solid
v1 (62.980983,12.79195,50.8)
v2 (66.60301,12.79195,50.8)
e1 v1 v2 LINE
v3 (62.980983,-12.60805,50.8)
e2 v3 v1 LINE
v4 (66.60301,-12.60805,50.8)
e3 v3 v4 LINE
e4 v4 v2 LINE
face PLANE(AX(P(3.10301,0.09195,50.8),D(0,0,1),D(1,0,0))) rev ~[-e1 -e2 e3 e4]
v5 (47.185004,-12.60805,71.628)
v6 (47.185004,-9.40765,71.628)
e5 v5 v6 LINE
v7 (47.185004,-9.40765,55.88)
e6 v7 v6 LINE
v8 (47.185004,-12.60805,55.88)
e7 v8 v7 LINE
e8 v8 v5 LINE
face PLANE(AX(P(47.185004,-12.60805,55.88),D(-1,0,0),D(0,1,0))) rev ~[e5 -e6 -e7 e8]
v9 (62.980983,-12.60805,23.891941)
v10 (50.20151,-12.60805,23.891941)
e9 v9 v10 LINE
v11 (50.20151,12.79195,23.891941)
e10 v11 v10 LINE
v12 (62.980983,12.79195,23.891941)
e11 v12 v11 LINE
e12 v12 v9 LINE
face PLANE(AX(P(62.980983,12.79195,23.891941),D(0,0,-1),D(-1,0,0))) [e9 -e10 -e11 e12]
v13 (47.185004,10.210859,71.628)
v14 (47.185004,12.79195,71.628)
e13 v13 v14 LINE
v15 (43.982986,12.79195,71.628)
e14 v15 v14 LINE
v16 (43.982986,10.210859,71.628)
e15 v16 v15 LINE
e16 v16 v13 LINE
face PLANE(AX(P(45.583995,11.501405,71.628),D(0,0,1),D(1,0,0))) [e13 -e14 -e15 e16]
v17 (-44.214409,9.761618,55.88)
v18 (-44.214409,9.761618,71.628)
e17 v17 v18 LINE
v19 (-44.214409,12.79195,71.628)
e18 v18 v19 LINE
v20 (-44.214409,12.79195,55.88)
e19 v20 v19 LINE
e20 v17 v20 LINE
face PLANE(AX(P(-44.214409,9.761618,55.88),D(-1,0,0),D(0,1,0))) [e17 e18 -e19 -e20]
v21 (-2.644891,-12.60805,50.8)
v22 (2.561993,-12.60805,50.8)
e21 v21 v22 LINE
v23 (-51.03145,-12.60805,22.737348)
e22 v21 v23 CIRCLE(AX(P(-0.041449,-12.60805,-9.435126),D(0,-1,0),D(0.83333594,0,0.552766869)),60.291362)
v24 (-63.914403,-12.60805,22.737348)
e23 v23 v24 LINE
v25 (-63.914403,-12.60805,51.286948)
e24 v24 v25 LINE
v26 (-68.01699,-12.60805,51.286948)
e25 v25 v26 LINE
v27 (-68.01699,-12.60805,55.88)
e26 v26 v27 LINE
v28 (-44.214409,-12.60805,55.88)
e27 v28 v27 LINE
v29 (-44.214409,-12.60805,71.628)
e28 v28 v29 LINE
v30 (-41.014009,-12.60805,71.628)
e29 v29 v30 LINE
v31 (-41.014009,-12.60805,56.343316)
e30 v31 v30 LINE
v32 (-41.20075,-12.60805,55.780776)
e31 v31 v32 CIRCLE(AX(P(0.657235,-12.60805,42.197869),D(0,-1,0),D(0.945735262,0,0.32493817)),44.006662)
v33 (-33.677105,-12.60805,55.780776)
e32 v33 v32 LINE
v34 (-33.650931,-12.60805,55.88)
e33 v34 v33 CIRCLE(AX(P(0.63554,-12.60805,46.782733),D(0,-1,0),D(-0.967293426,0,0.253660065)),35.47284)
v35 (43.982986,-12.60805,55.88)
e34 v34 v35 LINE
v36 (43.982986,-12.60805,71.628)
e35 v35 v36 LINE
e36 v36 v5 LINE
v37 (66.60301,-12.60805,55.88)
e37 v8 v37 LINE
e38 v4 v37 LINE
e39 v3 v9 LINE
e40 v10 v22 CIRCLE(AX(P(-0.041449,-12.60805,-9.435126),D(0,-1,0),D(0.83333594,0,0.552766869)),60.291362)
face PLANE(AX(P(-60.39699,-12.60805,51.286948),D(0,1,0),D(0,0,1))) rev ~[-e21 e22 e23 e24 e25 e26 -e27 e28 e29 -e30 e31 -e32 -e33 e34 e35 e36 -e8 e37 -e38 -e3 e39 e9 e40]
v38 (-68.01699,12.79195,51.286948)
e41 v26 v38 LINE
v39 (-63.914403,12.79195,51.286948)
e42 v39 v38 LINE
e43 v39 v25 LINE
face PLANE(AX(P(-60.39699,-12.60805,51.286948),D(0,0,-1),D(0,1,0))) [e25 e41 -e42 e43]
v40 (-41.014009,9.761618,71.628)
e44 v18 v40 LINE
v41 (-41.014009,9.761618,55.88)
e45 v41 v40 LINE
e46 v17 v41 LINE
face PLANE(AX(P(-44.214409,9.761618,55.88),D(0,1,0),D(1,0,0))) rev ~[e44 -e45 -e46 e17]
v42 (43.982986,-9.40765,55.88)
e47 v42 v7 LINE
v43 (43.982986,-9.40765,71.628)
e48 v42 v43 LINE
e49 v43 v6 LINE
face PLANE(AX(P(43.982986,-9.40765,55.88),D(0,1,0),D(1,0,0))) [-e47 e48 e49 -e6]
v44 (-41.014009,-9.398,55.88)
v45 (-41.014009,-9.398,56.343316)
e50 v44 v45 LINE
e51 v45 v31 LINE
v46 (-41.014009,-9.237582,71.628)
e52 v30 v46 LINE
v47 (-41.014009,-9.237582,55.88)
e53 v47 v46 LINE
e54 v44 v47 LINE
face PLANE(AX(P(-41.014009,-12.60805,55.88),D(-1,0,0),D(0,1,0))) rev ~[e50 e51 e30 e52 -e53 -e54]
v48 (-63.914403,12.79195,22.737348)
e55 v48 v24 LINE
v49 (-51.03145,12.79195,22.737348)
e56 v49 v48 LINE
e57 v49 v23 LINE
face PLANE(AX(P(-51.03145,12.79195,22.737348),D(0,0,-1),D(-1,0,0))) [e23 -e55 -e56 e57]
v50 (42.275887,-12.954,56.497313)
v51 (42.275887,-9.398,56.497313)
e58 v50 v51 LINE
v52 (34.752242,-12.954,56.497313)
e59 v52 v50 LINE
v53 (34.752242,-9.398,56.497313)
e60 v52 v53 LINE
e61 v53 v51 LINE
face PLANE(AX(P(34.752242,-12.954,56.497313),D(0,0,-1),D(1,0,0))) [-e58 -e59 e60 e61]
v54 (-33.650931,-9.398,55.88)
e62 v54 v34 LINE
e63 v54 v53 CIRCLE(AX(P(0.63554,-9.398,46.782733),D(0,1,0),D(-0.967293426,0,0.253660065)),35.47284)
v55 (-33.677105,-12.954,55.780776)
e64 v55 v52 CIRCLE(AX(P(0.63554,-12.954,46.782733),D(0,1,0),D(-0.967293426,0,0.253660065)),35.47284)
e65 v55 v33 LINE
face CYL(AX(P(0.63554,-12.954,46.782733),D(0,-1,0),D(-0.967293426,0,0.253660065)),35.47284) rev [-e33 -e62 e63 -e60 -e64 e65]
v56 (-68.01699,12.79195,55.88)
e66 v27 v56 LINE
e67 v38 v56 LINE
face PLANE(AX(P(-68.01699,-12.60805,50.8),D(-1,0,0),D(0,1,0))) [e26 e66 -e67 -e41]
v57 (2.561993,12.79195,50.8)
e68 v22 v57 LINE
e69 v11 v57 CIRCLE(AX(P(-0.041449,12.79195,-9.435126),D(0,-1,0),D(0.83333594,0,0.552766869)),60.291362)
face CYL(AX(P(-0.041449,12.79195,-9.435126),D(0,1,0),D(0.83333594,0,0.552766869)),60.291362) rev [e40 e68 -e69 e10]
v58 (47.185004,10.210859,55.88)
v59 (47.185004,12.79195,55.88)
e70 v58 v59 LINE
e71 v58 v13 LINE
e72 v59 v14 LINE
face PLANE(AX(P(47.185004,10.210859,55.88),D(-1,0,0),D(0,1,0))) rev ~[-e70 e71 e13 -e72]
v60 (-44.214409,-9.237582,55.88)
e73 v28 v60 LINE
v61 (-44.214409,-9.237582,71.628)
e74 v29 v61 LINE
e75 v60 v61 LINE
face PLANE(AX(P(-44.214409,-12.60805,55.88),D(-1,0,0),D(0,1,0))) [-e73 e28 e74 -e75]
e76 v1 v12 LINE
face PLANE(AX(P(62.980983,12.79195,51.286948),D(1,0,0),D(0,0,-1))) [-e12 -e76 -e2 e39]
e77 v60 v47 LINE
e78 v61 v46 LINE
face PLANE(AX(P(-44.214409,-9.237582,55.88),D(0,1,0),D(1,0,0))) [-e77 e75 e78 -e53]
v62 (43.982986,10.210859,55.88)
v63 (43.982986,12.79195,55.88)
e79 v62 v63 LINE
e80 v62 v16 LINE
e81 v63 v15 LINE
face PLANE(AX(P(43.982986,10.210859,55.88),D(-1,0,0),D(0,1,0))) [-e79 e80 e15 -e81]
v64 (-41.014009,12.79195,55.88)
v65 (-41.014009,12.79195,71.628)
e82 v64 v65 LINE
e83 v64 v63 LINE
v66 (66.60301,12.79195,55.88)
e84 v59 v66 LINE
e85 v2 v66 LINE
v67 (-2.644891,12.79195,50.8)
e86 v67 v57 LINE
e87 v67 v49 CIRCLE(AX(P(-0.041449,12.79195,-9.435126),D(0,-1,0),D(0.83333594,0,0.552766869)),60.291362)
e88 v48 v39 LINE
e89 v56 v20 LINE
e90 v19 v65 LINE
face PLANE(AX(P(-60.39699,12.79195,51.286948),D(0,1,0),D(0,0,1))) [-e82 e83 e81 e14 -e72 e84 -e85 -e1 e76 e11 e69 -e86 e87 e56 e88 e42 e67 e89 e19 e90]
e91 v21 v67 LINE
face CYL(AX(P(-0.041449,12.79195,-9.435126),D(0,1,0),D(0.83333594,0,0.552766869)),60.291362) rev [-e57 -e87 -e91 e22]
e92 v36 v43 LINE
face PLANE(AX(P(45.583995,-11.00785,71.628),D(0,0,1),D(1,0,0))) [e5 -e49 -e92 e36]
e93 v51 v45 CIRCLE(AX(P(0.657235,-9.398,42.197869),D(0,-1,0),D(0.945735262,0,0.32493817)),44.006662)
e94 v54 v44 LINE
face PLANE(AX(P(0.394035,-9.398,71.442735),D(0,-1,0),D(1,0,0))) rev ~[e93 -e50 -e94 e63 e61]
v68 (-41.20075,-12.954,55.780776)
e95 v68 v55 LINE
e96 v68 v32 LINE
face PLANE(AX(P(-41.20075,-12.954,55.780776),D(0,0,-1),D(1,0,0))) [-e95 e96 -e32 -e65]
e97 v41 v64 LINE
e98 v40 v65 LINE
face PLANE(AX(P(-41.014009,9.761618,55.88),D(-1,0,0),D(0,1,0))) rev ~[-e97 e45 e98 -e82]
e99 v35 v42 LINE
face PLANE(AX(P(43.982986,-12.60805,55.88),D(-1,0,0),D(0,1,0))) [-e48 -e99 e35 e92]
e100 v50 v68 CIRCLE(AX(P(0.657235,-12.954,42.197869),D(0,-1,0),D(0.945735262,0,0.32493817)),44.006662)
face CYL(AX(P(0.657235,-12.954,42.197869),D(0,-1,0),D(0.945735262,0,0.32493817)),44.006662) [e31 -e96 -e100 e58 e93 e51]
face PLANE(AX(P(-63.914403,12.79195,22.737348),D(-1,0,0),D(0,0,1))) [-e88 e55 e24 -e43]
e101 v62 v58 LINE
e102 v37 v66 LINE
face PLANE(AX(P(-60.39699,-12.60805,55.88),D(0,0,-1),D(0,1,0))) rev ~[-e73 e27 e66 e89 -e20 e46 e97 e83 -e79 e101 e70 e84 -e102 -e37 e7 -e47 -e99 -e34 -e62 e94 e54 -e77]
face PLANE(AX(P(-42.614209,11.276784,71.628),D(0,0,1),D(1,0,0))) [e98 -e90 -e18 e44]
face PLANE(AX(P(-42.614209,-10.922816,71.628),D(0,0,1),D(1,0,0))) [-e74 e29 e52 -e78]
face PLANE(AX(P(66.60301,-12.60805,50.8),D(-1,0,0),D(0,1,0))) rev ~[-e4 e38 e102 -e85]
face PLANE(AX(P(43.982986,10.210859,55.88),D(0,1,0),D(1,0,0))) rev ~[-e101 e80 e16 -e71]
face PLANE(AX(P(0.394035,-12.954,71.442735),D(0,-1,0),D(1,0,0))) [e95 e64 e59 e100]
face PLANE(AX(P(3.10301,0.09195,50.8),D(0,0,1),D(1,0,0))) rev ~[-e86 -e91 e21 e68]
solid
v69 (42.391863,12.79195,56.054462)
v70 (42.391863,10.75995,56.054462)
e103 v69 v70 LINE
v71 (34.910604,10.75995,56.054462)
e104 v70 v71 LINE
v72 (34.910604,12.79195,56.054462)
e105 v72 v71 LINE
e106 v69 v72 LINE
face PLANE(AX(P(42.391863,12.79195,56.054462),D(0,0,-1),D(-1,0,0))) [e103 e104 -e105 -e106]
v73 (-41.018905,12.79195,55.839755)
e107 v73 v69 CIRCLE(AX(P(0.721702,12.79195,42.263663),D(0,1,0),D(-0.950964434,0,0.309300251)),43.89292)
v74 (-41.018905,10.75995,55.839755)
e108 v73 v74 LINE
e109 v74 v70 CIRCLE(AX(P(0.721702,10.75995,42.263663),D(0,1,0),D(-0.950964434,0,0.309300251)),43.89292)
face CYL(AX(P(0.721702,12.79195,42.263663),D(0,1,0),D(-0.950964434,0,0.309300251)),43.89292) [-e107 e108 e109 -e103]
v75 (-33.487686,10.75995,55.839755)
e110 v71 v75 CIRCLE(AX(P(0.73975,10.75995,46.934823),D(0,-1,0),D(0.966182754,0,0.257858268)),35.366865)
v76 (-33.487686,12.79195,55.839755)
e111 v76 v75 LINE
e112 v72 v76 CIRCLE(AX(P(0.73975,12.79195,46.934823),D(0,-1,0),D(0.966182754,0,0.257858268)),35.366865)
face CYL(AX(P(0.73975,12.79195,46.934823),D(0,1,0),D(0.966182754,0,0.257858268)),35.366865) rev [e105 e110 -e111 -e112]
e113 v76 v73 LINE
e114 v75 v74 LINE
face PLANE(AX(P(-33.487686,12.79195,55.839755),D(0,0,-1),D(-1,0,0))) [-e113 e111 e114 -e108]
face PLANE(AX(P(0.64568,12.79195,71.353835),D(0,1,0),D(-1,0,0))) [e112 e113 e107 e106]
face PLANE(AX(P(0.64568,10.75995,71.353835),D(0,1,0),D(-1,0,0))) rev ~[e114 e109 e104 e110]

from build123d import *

# Parameters (mm, degrees)
F3_W      = 127
F3_H      = 25.4
F4_DEPTH  = 5.08
F5_W      = 3.2020173967
F5_H      = 2.5810918153
F5_H_2    = 3.2004
F5_W_2    = 3.2004
F5_H_3    = 3.030332116
F5_H_4    = 3.370467884
F6_DEPTH  = 15.748
F9_DEPTH  = 25.4
F10_DEPTH = 7.62
F13_DEPTH = 3.556
F14_DEPTH = 2.032


with BuildPart() as f4:
    # F3 (on offset) → F4 (new body)
    with BuildSketch(Plane.XY.offset(50.8)):
        with Locations((3.1030103564, 0.0919504733)):
            Rectangle(F3_W, F3_H)
    extrude(amount=F4_DEPTH)

    # F5 (on face) → F6 (join)
    with BuildSketch(Plane.XY.offset(55.88)):
        with Locations((45.5839950591, 11.5014045656)):
            Rectangle(F5_W, F5_H)
        with Locations((45.5839950591, -11.0078495267)):
            Rectangle(F5_W, F5_H_2)
        with Locations((-42.6142088447, 11.2767844153)):
            Rectangle(F5_W_2, F5_H_3)
        with Locations((-42.6142088447, -10.9228155847)):
            Rectangle(F5_W_2, F5_H_4)
    extrude(amount=F6_DEPTH)

    # F8 (on offset) → F9 (join)
    with BuildSketch(Plane(origin=(0, 12.7919504733, 0), x_dir=(-1, 0, 0), z_dir=(0, 1, 0))):
        with BuildLine():
            Line((63.9144031451, 22.7373477172), (63.9144031451, 51.2869477172))
            Line((63.9144031451, 51.2869477172), (-62.980983232, 51.2869477172))
            Line((-62.980983232, 51.2869477172), (-62.980983232, 23.8919413011))
            Line((-62.980983232, 23.8919413011), (-50.2015098581, 23.8919413011))
            ThreePointArc((-50.2015098581, 23.8919413011), (0.729046025, 50.8523148548), (51.0314504165, 22.7373477172))
            Line((51.0314504165, 22.7373477172), (63.9144031451, 22.7373477172))
        make_face()
    extrude(amount=-F9_DEPTH)

    # F10 (add): a face of the model
    f10_faces = [f4.faces().sort_by_distance(p)[0] for p in [
        (-60.3969896436, 0.0919504733, 53.5834738586),
    ]]
    extrude(f10_faces, amount=F10_DEPTH)

    # F12 (on offset) → F13 (join)
    with BuildSketch(Plane.XZ.offset(12.954)):
        with BuildLine():
            Line((34.7522422671, 56.4973130822), (42.2758869827, 56.4973130822))
            ThreePointArc((42.2758869827, 56.4973130822), (0.279509926, 86.2029094565), (-41.2007495761, 55.7807758451))
            Line((-41.2007495761, 55.7807758451), (-33.6771048605, 55.7807758451))
            ThreePointArc((-33.6771048605, 55.7807758451), (0.264117723, 82.2536287212), (34.7522422671, 56.4973130822))
        make_face()
    extrude(amount=-F13_DEPTH)


with BuildPart() as f14:
    # F11 (on offset) → F14 (new body)
    with BuildSketch(Plane(origin=(0, 12.7919504733, 0), x_dir=(-1, 0, 0), z_dir=(0, 1, 0))):
        with BuildLine():
            Line((33.4876855967, 55.8397546411), (41.0189045158, 55.8397546411))
            ThreePointArc((41.0189045158, 55.8397546411), (-0.6087174648, 86.1564382353), (-42.3918627203, 56.0544617474))
            Line((-42.3918627203, 56.0544617474), (-34.9106043577, 56.0544617474))
            ThreePointArc((-34.9106043577, 56.0544617474), (-0.6287310234, 82.3015137584), (33.4876855967, 55.8397546411))
        make_face()
    extrude(amount=-F14_DEPTH)


solid = Compound([f4.part, f14.part])
